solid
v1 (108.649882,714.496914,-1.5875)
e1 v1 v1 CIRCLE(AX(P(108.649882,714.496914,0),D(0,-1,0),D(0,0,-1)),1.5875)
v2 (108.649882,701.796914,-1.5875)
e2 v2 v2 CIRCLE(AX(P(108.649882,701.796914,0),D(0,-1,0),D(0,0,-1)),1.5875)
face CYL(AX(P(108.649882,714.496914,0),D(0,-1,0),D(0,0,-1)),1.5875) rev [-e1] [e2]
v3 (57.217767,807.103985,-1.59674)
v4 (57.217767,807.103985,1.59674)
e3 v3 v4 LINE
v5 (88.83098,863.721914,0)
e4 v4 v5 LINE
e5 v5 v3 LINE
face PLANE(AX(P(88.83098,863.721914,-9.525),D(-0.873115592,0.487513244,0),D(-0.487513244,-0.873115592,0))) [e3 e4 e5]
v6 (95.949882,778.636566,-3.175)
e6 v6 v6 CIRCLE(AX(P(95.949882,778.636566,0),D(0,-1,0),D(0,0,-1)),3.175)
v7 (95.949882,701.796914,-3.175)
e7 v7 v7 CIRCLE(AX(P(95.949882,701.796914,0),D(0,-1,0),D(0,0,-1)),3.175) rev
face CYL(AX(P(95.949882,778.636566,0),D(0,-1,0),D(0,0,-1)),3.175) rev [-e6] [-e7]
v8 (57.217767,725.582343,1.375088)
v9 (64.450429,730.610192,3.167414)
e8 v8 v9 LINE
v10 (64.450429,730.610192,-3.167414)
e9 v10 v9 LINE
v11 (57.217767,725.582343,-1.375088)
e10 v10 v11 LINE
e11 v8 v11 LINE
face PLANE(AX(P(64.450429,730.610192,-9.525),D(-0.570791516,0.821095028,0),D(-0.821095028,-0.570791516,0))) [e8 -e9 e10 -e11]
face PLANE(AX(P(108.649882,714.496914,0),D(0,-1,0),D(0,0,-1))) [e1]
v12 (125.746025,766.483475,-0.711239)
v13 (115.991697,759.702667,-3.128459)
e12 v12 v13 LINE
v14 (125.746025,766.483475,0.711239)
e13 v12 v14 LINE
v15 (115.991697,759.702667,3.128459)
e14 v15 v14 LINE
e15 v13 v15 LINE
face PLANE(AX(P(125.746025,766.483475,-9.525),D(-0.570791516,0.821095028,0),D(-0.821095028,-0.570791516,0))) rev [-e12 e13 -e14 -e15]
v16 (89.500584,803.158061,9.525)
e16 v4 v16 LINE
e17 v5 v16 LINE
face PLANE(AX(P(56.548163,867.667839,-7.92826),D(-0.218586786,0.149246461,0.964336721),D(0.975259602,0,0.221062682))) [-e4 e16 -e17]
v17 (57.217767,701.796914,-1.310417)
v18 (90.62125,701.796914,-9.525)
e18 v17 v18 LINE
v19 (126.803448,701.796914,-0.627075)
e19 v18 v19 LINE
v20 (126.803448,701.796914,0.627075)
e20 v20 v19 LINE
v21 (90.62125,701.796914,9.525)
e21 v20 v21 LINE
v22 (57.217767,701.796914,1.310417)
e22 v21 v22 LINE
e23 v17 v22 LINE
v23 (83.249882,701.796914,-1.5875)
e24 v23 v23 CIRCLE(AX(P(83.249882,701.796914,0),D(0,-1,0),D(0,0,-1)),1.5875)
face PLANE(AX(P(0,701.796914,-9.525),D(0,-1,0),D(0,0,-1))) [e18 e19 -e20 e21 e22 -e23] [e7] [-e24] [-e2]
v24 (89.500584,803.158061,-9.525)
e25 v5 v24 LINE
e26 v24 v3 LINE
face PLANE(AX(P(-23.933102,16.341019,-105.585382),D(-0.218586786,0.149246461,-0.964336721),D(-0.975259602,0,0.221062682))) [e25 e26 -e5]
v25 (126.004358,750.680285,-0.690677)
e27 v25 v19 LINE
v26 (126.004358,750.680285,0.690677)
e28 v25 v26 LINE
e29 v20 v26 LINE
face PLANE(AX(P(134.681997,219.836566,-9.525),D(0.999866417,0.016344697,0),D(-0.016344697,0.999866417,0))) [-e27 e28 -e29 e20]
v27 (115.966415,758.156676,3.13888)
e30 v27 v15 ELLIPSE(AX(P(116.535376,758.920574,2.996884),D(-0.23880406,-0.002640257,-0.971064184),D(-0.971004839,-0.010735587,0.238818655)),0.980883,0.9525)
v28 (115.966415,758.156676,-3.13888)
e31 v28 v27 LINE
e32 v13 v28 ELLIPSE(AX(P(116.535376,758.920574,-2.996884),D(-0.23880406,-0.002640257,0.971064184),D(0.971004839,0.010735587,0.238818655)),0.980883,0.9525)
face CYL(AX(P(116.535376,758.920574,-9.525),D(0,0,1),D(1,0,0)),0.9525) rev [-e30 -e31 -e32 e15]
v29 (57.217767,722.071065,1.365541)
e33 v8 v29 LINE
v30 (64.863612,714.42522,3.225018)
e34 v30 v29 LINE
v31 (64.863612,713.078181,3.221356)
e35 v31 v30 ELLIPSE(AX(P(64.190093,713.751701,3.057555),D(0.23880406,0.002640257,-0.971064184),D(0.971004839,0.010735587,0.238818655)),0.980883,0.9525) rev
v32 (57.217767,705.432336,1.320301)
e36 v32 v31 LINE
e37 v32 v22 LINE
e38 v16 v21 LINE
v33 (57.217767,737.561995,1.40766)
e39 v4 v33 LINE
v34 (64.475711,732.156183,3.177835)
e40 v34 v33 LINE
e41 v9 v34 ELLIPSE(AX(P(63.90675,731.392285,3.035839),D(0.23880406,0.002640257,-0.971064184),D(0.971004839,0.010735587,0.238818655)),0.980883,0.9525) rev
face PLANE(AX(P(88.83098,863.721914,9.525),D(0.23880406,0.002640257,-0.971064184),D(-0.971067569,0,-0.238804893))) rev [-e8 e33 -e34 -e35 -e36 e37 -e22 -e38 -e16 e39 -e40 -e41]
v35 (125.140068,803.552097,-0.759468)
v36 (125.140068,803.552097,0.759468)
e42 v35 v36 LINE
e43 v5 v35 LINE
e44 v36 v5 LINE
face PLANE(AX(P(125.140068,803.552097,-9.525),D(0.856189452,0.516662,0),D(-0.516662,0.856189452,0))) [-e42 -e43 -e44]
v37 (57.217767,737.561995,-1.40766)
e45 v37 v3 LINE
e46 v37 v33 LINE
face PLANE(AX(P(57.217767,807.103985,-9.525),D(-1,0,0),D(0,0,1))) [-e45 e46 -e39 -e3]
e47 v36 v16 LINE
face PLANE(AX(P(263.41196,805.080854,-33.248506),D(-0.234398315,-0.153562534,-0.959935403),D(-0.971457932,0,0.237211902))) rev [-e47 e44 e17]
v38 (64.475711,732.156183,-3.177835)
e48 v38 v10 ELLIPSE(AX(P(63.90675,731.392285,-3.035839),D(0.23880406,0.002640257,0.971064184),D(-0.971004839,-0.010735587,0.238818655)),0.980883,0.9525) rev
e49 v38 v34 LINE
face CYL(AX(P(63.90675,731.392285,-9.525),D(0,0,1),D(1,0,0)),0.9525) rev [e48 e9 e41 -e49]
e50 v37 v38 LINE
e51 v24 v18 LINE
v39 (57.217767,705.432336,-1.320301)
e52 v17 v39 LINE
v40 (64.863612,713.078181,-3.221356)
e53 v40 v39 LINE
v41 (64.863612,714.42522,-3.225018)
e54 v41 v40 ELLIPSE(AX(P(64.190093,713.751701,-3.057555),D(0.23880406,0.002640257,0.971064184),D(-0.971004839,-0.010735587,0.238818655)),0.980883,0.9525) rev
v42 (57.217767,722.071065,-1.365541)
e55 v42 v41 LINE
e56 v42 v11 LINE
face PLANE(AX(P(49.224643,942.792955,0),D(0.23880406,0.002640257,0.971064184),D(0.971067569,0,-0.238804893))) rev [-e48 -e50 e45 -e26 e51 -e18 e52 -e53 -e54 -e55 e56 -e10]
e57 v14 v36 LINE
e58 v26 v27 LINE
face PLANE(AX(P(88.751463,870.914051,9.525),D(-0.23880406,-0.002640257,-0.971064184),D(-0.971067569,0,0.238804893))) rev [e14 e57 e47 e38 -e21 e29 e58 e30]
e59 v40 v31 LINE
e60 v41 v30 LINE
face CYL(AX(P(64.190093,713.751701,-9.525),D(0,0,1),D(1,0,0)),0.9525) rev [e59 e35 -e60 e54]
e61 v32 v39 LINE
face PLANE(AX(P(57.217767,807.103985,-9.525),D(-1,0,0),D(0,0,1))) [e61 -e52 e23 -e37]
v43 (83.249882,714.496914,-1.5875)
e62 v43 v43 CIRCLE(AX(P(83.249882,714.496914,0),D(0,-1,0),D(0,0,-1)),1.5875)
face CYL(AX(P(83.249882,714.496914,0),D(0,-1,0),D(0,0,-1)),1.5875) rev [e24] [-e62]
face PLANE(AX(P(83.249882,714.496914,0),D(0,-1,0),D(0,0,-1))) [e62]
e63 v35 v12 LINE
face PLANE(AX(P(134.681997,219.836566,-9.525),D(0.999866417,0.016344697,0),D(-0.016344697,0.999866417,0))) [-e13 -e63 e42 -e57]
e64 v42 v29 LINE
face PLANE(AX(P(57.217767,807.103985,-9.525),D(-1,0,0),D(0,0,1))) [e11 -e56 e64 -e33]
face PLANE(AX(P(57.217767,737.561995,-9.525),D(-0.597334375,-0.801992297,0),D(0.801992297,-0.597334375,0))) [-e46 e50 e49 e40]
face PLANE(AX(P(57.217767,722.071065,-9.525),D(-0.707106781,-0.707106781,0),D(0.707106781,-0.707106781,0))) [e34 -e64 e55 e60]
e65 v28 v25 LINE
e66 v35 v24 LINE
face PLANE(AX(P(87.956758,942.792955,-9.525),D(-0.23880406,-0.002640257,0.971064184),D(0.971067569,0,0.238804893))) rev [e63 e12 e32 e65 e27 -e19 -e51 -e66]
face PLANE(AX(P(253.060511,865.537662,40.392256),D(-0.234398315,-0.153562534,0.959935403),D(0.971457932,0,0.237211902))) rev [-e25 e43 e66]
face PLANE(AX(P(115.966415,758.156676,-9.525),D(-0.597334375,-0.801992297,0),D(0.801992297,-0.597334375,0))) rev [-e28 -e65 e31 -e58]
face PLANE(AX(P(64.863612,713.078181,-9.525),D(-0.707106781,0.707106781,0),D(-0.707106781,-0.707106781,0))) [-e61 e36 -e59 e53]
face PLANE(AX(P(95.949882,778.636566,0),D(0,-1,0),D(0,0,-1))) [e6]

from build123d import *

# Parameters (mm, degrees)
BOSS_EXTRUDE1_DEPTH      = 9.525
BOSS_EXTRUDE1_DEPTH_BACK = 9.525
CUT_SWEEP2_START         = 153.457157687
CUT_SWEEP2_OUTLINE_W     = 59
CUT_SWEEP2_OUTLINE_H     = 64
CUT_SWEEP2_DEPTH         = 10.542842313
CUT_SWEEP6_START         = 153.457157687
CUT_SWEEP6_OUTLINE_W     = 53
CUT_SWEEP6_OUTLINE_H     = 64
CUT_SWEEP6_DEPTH         = 9.143384714
SKETCH21_W               = 71.62814367
SKETCH21_H               = 75.485551221
CUT_EXTRUDE5_DEPTH       = 47.371
CUT_EXTRUDE6_DEPTH       = 875.211365037
CUT_EXTRUDE6_DEPTH_BACK  = 875.211365037
SKETCH23_R               = 3.175
CUT_EXTRUDE7_DEPTH       = 558.8
CUT_EXTRUDE17_DEPTH      = 875.211365037
CUT_EXTRUDE17_DEPTH_BACK = 875.211365037
SKETCH24_W               = 149.671164142
SKETCH24_H               = 168.486967634
SKETCH24_H_2             = 161.925
SKETCH31_R               = 1.5875
CUT_EXTRUDE18_DEPTH      = 12.7


with BuildPart() as part:
    # Sketch1 → Boss-Extrude1 (new, two sides: drawn at the far end of the back side and taken through both)
    with BuildSketch(Plane.XY.offset(-BOSS_EXTRUDE1_DEPTH_BACK)):
        Polygon((57.217766507, 219.836565958), (134.681996719, 219.836565958), (125.140068317, 803.55209701), (88.830980485, 863.721914098), (57.217766507, 807.103985498), align=None)
    extrude(amount=BOSS_EXTRUDE1_DEPTH + BOSS_EXTRUDE1_DEPTH_BACK)

    # Cut-Sweep1: sweep along a path in Sketch4
    with BuildLine(Plane.XY.offset(9.525)) as cut_sweep1_path:
        Line((95.949881613, 219.836565958), (88.830980485, 863.721914098))
    # Sketch2 → Cut-Sweep1 (sweep, cut)
    with BuildSketch(Plane.XZ.offset(-219.836565958)):
        Polygon((95.949881613, 9.525), (134.681996719, 0), (134.681996719, 9.525), align=None)
    sweep(path=cut_sweep1_path.line, mode=Mode.SUBTRACT)

    # Cut-Sweep2: read off the stored shape, not the designer's step
    # Cut-Sweep2 outline → Cut-Sweep2 (cut)
    with BuildSketch(Plane(origin=(0, 0, 0), x_dir=(0.9721406430200956, -0.0370263288920756, -0.23145544097568965), z_dir=(0.2343983152423991, 0.15356253367517805, 0.9599354030677193)).offset(CUT_SWEEP2_START)):
        with Locations((63.5, 822)):
            Rectangle(CUT_SWEEP2_OUTLINE_W, CUT_SWEEP2_OUTLINE_H)
    extrude(amount=CUT_SWEEP2_DEPTH, mode=Mode.SUBTRACT)

    # Cut-Sweep3: sweep along a path in Sketch8
    with BuildLine(Plane.XY.offset(9.525)) as cut_sweep3_path:
        Line((95.949881613, 219.836565958), (88.830980485, 863.721914098))
    # Sketch7 → Cut-Sweep3 (sweep, cut)
    with BuildSketch(Plane.XZ.offset(-219.836565958)):
        Polygon((95.949881613, 9.525), (57.217766507, 0), (57.217766507, 9.525), align=None)
    sweep(path=cut_sweep3_path.line, mode=Mode.SUBTRACT)

    # Cut-Sweep4: sweep along a path in Sketch10
    with BuildLine(Plane(origin=(3.4015871, 0.0376085, -13.832090615), x_dir=(0.9710677735095292, -0.0006492893666849942, 0.23880317768941897), z_dir=(-0.23880406037428656, -0.002640256529482778, 0.9710641841784778))) as cut_sweep4_path:
        Line((55.419591582, 807.105343631), (88.664251397, 803.18099011))
    # Sketch9 → Cut-Sweep4 (sweep, cut)
    with BuildSketch(Plane(origin=(98.36840601, 1.087577095, 0), x_dir=(0, 0, 1), z_dir=(-0.9999388862366849, -0.011055486951654862, 0))):
        Polygon((9.525, 802.119504525), (27.927952665, 862.687059056), (0, 862.687059056), align=None)
    sweep(path=cut_sweep4_path.line, mode=Mode.SUBTRACT)

    # Cut-Sweep5: sweep along a path in Sketch12
    with BuildLine(Plane(origin=(0, 0, -9.525), x_dir=(-1, 0, 0), z_dir=(0, 0, -1))) as cut_sweep5_path:
        Line((-88.830980485, 863.721914098), (-95.949881613, 219.836565958))
    # Sketch11 → Cut-Sweep5 (sweep, cut)
    with BuildSketch(Plane.XZ.offset(-219.836565958)):
        Polygon((95.949881613, -9.525), (134.681996719, 0), (134.681996719, -15.883536915), (57.217766507, -15.883536915), (57.217766507, 0), align=None)
    sweep(path=cut_sweep5_path.line, mode=Mode.SUBTRACT)

    # Cut-Sweep6: read off the stored shape, not the designer's step
    # Cut-Sweep6 outline → Cut-Sweep6 (cut)
    with BuildSketch(Plane(origin=(0, 0, 0), x_dir=(0.9721406430200958, -0.03702632889207545, 0.2314554409756887), z_dir=(0.23439831524239813, 0.1535625336751781, -0.9599354030677195)).offset(CUT_SWEEP6_START)):
        with Locations((66.5, -822)):
            Rectangle(CUT_SWEEP6_OUTLINE_W, CUT_SWEEP6_OUTLINE_H)
    extrude(amount=CUT_SWEEP6_DEPTH, mode=Mode.SUBTRACT)

    # Sketch21 → Cut-Extrude5 (cut)
    with BuildSketch(Plane(origin=(-23.933102236, 16.341018935, -105.585382191), x_dir=(-0.9758175121644082, -0.033431767496308724, 0.2160150454837301), z_dir=(-0.2185867858615091, 0.14924646088248067, -0.9643367207364807))):
        with Locations((-95.99768501, 822.261491576)):
            Rectangle(SKETCH21_W, SKETCH21_H)
    extrude(amount=CUT_EXTRUDE5_DEPTH, mode=Mode.SUBTRACT)

    # Sketch22 → Cut-Extrude6 (cut, two sides: drawn at the far end of the back side and taken through both)
    with BuildSketch(Plane.XY.offset(-CUT_EXTRUDE6_DEPTH_BACK)):
        with BuildLine():
            Line((57.217766507, 737.561994928), (64.475710809, 732.15618288))
            ThreePointArc((64.475710809, 732.15618288), (64.859122479, 731.376710767), (64.450428737, 730.610192203))
            Line((64.450428737, 730.610192203), (57.217766507, 725.582342683))
            Line((57.217766507, 725.582342683), (57.217766507, 737.561994928))
        make_face()
        with BuildLine():
            Line((57.217766507, 722.071065301), (64.863611969, 714.425219839))
            ThreePointArc((64.863611969, 714.425219839), (65.14259276, 713.751700629), (64.863611969, 713.07818142))
            Line((64.863611969, 713.07818142), (57.217766507, 705.432335958))
            Line((57.217766507, 705.432335958), (57.217766507, 722.071065301))
        make_face()
        with BuildLine():
            Line((125.746024678, 766.483474766), (115.991696873, 759.702666979))
            ThreePointArc((115.991696873, 759.702666979), (115.583003131, 758.936148415), (115.966414801, 758.156676302))
            Line((115.966414801, 758.156676302), (126.004357543, 750.680284978))
            Line((126.004357543, 750.680284978), (125.746024678, 766.483474766))
        make_face()
        with BuildLine():
            Line((130.504368952, 475.397717553), (120.864153688, 462.45458434))
            ThreePointArc((120.864153688, 462.45458434), (120.675678689, 461.901197798), (120.845958337, 461.341944429))
            Line((120.845958337, 461.341944429), (130.972260191, 446.775056406))
            Line((130.972260191, 446.775056406), (130.504368952, 475.397717553))
        make_face()
        with BuildLine():
            Line((57.217766507, 423.998589411), (65.145848829, 412.59388421))
            ThreePointArc((65.145848829, 412.59388421), (65.316128476, 412.03463084), (65.127653478, 411.481244299))
            Line((65.127653478, 411.481244299), (57.217766507, 400.861282196))
            Line((57.217766507, 400.861282196), (57.217766507, 423.998589411))
        make_face()
    extrude(amount=CUT_EXTRUDE6_DEPTH + CUT_EXTRUDE6_DEPTH_BACK, mode=Mode.SUBTRACT)

    # Sketch23 → Cut-Extrude7 (cut)
    with BuildSketch(Plane.XZ.offset(-219.836565958)):
        with Locations(Location((95.949881613, 0, 0), (0, 0, 270))):
            Circle(SKETCH23_R)
    extrude(amount=-CUT_EXTRUDE7_DEPTH, mode=Mode.SUBTRACT)

    # Sketch24 → Cut-Extrude17 (cut, two sides: drawn at the far end of the back side and taken through both)
    with BuildSketch(Plane.XY.offset(-CUT_EXTRUDE17_DEPTH_BACK)):
        with Locations((94.66698592, 293.703430281)):
            Rectangle(SKETCH24_W, SKETCH24_H)
        with Locations((94.66698592, 458.909414098)):
            Rectangle(SKETCH24_W, SKETCH24_H_2)
        with Locations((94.66698592, 620.834414098)):
            Rectangle(SKETCH24_W, SKETCH24_H_2)
    extrude(amount=CUT_EXTRUDE17_DEPTH + CUT_EXTRUDE17_DEPTH_BACK, mode=Mode.SUBTRACT)

    # Sketch31 → Cut-Extrude18 (cut)
    with BuildSketch(Plane.XZ.offset(-701.796914098)):
        with Locations(Location((83.249881613, 0, 0), (0, 0, 270))):
            Circle(SKETCH31_R)
        with Locations(Location((108.649881613, 0, 0), (0, 0, 270))):
            Circle(SKETCH31_R)
    extrude(amount=-CUT_EXTRUDE18_DEPTH, mode=Mode.SUBTRACT)


solid = part.part
